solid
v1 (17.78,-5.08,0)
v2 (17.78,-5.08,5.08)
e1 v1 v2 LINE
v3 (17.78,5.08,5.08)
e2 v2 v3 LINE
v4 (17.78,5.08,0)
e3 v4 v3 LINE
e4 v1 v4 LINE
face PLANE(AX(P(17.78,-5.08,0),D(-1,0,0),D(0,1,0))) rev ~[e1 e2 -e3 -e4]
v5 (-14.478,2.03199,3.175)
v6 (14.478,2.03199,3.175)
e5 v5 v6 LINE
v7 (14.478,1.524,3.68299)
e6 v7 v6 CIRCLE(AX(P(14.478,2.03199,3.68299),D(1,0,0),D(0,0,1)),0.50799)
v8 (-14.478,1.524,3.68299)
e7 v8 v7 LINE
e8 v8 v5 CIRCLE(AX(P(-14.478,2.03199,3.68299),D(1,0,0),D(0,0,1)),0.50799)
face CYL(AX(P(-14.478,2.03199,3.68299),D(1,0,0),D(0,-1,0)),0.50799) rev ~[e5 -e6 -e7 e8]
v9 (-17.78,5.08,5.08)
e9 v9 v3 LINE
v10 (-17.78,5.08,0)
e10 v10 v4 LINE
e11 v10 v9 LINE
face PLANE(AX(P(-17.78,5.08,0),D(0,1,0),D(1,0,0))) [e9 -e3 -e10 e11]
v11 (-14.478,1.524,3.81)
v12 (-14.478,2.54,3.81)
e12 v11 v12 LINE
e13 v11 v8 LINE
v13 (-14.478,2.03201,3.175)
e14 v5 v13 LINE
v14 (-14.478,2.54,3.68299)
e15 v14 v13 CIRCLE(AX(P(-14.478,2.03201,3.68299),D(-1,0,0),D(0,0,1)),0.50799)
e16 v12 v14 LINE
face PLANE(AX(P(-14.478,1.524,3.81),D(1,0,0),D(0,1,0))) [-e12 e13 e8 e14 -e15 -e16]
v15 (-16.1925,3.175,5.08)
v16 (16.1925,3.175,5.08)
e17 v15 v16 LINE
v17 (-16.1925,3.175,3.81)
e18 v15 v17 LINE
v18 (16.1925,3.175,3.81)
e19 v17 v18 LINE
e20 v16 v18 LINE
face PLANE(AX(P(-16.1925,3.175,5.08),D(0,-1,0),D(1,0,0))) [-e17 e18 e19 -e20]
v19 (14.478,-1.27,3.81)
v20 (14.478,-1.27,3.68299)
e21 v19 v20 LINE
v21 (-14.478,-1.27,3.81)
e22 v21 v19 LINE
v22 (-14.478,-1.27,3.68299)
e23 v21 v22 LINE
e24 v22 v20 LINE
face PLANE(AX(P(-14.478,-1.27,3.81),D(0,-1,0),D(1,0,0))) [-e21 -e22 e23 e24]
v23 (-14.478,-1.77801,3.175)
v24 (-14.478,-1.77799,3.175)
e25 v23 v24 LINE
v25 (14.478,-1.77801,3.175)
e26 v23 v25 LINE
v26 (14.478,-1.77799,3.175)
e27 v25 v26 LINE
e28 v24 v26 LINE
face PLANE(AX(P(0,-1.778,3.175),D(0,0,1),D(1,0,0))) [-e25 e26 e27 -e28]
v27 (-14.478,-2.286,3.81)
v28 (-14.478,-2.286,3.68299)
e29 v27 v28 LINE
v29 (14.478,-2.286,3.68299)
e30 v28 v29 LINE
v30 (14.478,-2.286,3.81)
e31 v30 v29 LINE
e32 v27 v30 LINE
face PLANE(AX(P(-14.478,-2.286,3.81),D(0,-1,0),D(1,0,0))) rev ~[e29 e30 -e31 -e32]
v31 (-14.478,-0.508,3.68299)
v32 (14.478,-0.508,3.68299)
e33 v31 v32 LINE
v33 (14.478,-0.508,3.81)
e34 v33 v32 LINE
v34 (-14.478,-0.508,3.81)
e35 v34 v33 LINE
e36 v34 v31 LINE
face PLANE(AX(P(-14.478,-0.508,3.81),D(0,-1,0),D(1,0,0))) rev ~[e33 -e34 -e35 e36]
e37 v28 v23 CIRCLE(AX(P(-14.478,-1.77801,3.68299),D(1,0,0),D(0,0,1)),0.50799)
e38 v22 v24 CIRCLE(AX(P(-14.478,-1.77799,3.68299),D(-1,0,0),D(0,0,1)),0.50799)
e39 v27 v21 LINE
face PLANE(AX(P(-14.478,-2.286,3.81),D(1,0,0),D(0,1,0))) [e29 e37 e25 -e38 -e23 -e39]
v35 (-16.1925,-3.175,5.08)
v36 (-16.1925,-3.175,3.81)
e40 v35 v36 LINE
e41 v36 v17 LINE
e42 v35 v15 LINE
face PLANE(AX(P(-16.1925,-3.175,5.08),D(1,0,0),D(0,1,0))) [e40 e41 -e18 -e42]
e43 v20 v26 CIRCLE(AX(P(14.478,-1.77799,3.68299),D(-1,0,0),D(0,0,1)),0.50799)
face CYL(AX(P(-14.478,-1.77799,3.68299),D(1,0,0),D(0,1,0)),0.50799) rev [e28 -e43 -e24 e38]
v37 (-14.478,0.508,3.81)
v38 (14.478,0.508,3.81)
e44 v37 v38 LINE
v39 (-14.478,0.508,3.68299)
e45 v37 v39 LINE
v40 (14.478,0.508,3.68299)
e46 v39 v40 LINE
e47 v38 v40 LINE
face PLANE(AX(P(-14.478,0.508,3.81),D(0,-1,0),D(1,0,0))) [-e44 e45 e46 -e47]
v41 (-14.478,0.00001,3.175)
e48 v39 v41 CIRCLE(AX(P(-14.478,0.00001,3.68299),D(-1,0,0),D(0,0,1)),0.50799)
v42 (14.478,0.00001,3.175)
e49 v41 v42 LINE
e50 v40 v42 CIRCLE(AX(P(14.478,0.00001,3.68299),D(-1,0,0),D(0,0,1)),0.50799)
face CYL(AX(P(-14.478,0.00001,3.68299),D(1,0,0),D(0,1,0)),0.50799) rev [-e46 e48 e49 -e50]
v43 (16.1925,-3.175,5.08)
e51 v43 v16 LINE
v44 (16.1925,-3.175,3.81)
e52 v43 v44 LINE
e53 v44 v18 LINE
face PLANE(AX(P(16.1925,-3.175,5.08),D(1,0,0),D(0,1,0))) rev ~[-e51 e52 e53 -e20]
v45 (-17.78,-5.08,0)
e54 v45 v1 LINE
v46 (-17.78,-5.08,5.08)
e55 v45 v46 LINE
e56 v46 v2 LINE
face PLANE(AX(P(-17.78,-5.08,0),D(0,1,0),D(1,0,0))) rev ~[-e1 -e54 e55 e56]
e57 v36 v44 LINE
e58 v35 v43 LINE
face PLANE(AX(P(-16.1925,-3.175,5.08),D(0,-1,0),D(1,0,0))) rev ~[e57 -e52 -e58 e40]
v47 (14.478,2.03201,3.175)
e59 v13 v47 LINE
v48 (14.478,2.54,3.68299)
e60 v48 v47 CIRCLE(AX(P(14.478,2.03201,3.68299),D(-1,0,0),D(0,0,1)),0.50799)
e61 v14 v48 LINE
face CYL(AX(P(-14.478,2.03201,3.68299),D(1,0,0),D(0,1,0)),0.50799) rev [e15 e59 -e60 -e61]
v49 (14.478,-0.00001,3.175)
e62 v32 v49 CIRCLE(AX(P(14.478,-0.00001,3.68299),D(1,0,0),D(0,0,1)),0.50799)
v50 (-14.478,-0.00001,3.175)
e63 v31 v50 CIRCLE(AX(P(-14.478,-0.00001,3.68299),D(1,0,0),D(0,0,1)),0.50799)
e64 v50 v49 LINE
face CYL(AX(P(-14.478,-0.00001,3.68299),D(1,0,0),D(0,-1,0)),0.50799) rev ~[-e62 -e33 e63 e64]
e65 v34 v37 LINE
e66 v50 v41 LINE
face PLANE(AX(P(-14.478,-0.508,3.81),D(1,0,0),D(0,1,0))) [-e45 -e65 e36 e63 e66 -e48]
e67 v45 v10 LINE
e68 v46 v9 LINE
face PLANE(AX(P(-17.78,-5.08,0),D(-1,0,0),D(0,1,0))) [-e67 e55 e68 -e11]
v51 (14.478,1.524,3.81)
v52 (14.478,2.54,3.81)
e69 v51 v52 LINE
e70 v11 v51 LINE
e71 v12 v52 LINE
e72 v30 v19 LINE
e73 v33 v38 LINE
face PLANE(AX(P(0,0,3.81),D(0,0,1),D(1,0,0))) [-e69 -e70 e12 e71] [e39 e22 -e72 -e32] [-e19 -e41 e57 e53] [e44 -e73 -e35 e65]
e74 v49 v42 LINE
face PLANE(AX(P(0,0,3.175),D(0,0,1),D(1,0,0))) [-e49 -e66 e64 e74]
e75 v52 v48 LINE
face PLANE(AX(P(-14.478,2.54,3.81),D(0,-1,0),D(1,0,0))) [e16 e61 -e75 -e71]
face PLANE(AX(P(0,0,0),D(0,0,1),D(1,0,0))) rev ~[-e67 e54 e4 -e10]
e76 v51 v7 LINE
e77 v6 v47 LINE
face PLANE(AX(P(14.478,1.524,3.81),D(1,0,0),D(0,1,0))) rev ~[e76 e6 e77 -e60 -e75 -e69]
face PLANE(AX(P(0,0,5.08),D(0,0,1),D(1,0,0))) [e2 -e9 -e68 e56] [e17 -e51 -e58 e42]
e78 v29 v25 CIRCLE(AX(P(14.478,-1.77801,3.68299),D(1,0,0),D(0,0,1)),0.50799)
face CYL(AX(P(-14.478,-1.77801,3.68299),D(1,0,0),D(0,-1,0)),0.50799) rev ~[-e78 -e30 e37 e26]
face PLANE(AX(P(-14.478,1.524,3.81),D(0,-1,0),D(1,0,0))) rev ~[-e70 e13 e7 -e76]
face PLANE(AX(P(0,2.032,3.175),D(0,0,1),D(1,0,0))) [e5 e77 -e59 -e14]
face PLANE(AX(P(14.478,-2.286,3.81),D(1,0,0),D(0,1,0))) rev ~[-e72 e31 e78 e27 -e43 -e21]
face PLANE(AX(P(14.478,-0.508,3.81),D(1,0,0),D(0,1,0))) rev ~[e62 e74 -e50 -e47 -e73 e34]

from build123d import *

# Parameters (mm, degrees)
F0_W     = 35.56
F0_H     = 10.16
F1_DEPTH = 5.08
F2_W     = 32.385
F2_H     = 6.35
F3_DEPTH = 1.27
F4_W     = 28.956
F4_H     = 1.016
F5_DEPTH = 0.635
F6_R     = 0.50799


# Not quite as in the source:
# - a fillet or chamfer is up to 0.001 mm smaller than in the source, because OpenCascade refuses the exact size


with BuildPart() as f1:
    # F0 (on Top) → F1 (new body)
    with BuildSketch(Plane.XY):
        Rectangle(F0_W, F0_H)
    extrude(amount=F1_DEPTH)

    # F2 (on face) → F3 (cut)
    with BuildSketch(Plane.XY.offset(5.08)):
        Rectangle(F2_W, F2_H)
    extrude(amount=-F3_DEPTH, mode=Mode.SUBTRACT)

    # F4 (on face) → F5 (cut)
    with BuildSketch(Plane.XY.offset(3.81)):
        Rectangle(F4_W, F4_H)
        with Locations((0, 2.032)):
            Rectangle(F4_W, F4_H)
        with Locations((0, -1.778)):
            Rectangle(F4_W, F4_H)
    extrude(amount=-F5_DEPTH, mode=Mode.SUBTRACT)

    # F6 (radius 0.508 in the source; OpenCascade refuses exactly that, so slightly less here)
    f6_edges = [f1.edges().sort_by_distance(p)[0] for p in [
        (0, 0.508, 3.175),
        (0, -0.508, 3.175),
        (0, 2.54, 3.175),
        (0, -1.27, 3.175),
        (0, 1.524, 3.175),
        (0, -2.286, 3.175),
    ]]
    fillet(f6_edges, radius=F6_R)


solid = f1.part
